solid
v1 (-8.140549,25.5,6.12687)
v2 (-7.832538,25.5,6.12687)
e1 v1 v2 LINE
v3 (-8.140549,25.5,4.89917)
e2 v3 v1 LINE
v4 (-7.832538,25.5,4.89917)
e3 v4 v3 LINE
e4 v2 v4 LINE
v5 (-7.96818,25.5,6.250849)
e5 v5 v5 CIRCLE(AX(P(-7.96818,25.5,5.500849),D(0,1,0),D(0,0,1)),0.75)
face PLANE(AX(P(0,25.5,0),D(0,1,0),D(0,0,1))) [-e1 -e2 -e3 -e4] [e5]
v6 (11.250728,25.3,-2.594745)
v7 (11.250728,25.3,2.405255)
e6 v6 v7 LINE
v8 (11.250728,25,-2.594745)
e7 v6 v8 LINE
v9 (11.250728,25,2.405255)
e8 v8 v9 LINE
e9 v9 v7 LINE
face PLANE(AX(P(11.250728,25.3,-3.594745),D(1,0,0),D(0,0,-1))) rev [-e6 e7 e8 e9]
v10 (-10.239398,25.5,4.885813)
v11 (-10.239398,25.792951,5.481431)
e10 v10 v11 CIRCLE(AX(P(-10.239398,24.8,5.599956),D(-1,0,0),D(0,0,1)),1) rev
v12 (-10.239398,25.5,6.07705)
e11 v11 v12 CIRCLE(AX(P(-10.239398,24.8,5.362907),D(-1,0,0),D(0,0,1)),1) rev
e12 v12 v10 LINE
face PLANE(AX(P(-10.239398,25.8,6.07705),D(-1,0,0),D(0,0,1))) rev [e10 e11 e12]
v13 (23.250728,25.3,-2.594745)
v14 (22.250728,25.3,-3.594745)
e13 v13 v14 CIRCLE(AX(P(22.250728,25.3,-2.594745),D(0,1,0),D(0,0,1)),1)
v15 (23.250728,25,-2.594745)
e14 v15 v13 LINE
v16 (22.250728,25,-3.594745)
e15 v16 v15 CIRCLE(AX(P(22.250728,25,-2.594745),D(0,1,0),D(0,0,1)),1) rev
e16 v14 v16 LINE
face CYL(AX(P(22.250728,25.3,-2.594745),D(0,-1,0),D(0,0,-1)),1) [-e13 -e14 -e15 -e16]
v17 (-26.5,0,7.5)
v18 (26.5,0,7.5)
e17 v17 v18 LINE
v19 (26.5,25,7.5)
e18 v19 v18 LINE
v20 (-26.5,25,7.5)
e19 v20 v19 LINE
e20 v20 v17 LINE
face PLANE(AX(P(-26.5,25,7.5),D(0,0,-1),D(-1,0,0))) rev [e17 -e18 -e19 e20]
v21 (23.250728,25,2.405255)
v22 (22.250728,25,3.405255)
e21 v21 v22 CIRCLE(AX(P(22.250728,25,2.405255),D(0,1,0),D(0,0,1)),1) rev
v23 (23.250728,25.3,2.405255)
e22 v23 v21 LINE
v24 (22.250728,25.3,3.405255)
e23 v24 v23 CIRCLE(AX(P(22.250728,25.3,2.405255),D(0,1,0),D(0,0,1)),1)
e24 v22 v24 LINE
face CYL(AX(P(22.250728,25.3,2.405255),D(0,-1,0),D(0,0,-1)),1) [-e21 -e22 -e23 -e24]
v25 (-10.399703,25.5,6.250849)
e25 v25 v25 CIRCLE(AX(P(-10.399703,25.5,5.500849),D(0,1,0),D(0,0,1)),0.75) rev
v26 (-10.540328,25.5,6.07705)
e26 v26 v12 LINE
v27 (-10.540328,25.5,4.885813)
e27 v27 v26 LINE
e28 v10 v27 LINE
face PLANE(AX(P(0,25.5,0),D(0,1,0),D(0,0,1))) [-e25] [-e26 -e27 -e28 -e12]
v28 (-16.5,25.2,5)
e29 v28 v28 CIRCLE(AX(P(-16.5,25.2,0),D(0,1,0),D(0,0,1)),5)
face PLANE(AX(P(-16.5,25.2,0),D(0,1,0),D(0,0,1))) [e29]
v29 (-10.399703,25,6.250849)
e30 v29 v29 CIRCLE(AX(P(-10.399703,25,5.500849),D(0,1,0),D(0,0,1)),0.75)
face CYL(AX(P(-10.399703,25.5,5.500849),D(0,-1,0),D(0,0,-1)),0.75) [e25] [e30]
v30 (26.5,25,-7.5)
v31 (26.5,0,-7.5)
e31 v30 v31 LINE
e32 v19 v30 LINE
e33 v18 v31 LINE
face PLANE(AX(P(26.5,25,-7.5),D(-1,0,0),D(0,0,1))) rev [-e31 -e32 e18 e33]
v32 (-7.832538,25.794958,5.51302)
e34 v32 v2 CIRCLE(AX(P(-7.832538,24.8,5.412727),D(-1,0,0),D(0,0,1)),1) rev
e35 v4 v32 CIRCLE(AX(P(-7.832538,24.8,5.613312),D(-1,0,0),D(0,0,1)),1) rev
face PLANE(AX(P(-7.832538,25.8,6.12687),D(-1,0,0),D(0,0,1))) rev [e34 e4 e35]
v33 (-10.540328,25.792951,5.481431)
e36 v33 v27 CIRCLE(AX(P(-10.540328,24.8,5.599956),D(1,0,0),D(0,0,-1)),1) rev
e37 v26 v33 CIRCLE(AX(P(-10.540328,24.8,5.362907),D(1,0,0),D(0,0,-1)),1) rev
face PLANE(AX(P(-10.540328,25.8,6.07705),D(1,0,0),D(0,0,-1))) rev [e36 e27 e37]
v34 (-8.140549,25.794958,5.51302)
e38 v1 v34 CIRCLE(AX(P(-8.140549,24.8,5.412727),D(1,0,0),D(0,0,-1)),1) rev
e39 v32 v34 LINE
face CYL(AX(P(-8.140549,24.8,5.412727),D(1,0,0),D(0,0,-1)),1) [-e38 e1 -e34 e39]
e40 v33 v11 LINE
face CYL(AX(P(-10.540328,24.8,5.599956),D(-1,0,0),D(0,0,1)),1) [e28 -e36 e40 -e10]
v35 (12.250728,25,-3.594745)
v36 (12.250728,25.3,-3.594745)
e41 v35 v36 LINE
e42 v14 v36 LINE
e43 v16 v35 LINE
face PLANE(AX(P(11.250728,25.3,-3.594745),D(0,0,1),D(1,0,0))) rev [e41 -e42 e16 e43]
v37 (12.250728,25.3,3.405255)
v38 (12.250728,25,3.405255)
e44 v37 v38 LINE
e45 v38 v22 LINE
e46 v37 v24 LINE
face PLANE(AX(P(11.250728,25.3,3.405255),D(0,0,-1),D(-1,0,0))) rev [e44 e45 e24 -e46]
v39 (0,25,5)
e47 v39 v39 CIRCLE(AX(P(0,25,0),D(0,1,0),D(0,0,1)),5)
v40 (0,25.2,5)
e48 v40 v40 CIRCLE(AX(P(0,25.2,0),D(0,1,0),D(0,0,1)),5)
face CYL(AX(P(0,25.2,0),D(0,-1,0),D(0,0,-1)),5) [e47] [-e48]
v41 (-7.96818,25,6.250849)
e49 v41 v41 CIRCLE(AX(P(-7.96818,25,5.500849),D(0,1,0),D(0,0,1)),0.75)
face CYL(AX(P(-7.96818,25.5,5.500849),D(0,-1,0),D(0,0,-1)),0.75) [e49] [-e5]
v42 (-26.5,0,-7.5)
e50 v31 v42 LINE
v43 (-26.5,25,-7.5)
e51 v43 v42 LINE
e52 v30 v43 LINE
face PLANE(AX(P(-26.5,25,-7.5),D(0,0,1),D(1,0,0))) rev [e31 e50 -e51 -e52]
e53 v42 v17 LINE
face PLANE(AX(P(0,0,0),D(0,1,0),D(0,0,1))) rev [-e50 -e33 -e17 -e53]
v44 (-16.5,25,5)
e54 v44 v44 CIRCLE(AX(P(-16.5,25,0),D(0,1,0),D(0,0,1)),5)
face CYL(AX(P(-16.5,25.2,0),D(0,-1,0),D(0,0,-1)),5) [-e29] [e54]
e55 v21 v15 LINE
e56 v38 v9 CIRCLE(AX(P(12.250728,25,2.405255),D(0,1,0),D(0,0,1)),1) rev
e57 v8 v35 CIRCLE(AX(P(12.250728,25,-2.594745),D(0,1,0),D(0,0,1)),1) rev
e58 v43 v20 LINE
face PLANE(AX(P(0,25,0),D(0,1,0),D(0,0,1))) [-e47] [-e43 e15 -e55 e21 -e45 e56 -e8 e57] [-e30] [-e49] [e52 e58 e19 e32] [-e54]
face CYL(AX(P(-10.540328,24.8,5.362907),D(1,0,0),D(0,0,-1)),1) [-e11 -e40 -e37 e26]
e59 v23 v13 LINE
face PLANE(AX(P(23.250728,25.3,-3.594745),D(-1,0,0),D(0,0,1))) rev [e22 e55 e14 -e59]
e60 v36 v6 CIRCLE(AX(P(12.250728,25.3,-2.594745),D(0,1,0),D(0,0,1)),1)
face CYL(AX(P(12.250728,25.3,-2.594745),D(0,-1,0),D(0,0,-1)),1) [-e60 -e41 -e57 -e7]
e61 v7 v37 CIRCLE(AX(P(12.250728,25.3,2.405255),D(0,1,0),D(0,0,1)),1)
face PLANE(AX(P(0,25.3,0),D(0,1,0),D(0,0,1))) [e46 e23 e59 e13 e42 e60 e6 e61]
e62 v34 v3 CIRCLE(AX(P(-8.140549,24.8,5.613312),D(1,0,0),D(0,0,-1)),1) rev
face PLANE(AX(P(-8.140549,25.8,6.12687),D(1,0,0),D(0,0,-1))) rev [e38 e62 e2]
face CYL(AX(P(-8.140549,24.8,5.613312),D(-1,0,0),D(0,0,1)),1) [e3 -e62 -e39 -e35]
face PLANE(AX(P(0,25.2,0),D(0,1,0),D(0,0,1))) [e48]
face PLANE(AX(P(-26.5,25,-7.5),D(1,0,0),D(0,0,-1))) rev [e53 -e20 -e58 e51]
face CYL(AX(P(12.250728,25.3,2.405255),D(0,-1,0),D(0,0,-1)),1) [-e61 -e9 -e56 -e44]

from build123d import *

# Parameters (mm, degrees)
SKETCH_1_W      = 53
SKETCH_1_H      = 15
EXTRUDE_1_DEPTH = 25
SKETCH_2_R      = 5
EXTRUDE_2_DEPTH = 0.2
SKETCH_3_R      = 0.75
EXTRUDE_4_DEPTH = 0.5
SKETCH_4_W      = 0.308010804
SKETCH_4_H      = 1.227700604
EXTRUDE_5_DEPTH = 0.3
SKETCH_6_W      = 0.300930155
SKETCH_6_H      = 1.191236652
EXTRUDE_8_DEPTH = 0.3
SKETCH_8_W      = 12
SKETCH_8_H      = 7
EXTRUDE_9_DEPTH = 0.3
FILLET_1_R      = 1
FILLET_2_R      = 1


with BuildPart() as part:
    # 草圖1 → 填料-伸長1 (new body)
    with BuildSketch(Plane(origin=(0, 0, 0), x_dir=(1, 0, 0), z_dir=(0, 1, 0))):
        Rectangle(SKETCH_1_W, SKETCH_1_H)
    extrude(amount=EXTRUDE_1_DEPTH)

    # 草圖2 → 填料-伸長2 (add)
    with BuildSketch(Plane(origin=(0, 25, 0), x_dir=(1, 0, 0), z_dir=(0, 1, 0))):
        with Locations(Location((0, 0, 0), (0, 0, 270))):
            Circle(SKETCH_2_R)
        with Locations(Location((-16.5, 0, 0), (0, 0, 270))):
            Circle(SKETCH_2_R)
    extrude(amount=EXTRUDE_2_DEPTH)

    # 草圖3 → 填料-伸長4 (add)
    with BuildSketch(Plane(origin=(0, 25, 0), x_dir=(1, 0, 0), z_dir=(0, 1, 0))):
        with Locations(Location((-7.968179653, -5.500848642, 0), (0, 0, 270))):
            Circle(SKETCH_3_R)
        with Locations(Location((-10.399702952, -5.500848642, 0), (0, 0, 270))):
            Circle(SKETCH_3_R)
    extrude(amount=EXTRUDE_4_DEPTH)

    # 草圖4 → 填料-伸長5 (add)
    with BuildSketch(Plane(origin=(0, 25.5, 0), x_dir=(1, 0, 0), z_dir=(0, 1, 0))):
        with Locations((-7.986543435, -5.513019863)):
            Rectangle(SKETCH_4_W, SKETCH_4_H)
    extrude(amount=EXTRUDE_5_DEPTH)

    # 草圖6 → 填料-伸長8 (add)
    with BuildSketch(Plane(origin=(0, 25.5, 0), x_dir=(1, 0, 0), z_dir=(0, 1, 0))):
        with Locations((-10.389863122, -5.481431278)):
            Rectangle(SKETCH_6_W, SKETCH_6_H)
    extrude(amount=EXTRUDE_8_DEPTH)

    # 草圖8 → 填料-伸長9 (add)
    with BuildSketch(Plane(origin=(0, 25, 0), x_dir=(1, 0, 0), z_dir=(0, 1, 0))):
        with Locations((17.250728111, 0.094744835)):
            Rectangle(SKETCH_8_W, SKETCH_8_H)
    extrude(amount=EXTRUDE_9_DEPTH)

    # 圓角1
    fillet_1_edges = [part.edges().sort_by_distance(p)[0] for p in [
        (23.250728111, 25.15, 3.405255165),
        (23.250728111, 25.15, -3.594744835),
        (11.250728111, 25.15, -3.594744835),
        (11.250728111, 25.15, 3.405255165),
    ]]
    fillet(fillet_1_edges, radius=FILLET_1_R)

    # 圓角2
    # the kernel refuses this fillet: 1 mm, written as the material it takes off along each edge
    with BuildSketch(Plane(origin=(-8.454040937, 25.8, 4.885812952), x_dir=(0, -1, 0), z_dir=(-1, 0, 0)), Plane(origin=(-12.325685306, 25.8, 6.077049604), x_dir=(0, -1, 0), z_dir=(1, 0, 0))) as fillet_2_piece_1:
        with BuildLine():
            CenterArc((1, 0.714142843), FILLET_2_R, 180, 45.572995999)
            Line((0, 0.714142843), (-0.02, 0.714142843))
            Line((-0.02, 0.714142843), (-0.02, 0))
            Line((-0.02, 0), (0, -0.02))
            ThreePointArc((0, -0.02), (0.15, -0.02), (0.286, -0.014282857))
            Line((0.286, -0.014282857), (0.3, 0))
        make_face()
    extrude(amount=3.871644369, mode=Mode.SUBTRACT)
    with BuildSketch(Plane(origin=(-9.925905944, 25.8, 6.126870165), x_dir=(0, -1, 0), z_dir=(1, 0, 0)), Plane(origin=(-6.047180926, 25.8, 4.899169561), x_dir=(0, -1, 0), z_dir=(-1, 0, 0))) as fillet_2_piece_2:
        with BuildLine():
            CenterArc((1, 0.714142843), FILLET_2_R, 180, 45.572995999)
            Line((0, 0.714142843), (-0.02, 0.714142843))
            Line((-0.02, 0.714142843), (-0.02, 0))
            Line((-0.02, 0), (0, -0.02))
            ThreePointArc((0, -0.02), (0.15, -0.02), (0.286, -0.014282857))
            Line((0.286, -0.014282857), (0.3, 0))
        make_face()
    extrude(amount=3.878725018, mode=Mode.SUBTRACT)


solid = part.part
